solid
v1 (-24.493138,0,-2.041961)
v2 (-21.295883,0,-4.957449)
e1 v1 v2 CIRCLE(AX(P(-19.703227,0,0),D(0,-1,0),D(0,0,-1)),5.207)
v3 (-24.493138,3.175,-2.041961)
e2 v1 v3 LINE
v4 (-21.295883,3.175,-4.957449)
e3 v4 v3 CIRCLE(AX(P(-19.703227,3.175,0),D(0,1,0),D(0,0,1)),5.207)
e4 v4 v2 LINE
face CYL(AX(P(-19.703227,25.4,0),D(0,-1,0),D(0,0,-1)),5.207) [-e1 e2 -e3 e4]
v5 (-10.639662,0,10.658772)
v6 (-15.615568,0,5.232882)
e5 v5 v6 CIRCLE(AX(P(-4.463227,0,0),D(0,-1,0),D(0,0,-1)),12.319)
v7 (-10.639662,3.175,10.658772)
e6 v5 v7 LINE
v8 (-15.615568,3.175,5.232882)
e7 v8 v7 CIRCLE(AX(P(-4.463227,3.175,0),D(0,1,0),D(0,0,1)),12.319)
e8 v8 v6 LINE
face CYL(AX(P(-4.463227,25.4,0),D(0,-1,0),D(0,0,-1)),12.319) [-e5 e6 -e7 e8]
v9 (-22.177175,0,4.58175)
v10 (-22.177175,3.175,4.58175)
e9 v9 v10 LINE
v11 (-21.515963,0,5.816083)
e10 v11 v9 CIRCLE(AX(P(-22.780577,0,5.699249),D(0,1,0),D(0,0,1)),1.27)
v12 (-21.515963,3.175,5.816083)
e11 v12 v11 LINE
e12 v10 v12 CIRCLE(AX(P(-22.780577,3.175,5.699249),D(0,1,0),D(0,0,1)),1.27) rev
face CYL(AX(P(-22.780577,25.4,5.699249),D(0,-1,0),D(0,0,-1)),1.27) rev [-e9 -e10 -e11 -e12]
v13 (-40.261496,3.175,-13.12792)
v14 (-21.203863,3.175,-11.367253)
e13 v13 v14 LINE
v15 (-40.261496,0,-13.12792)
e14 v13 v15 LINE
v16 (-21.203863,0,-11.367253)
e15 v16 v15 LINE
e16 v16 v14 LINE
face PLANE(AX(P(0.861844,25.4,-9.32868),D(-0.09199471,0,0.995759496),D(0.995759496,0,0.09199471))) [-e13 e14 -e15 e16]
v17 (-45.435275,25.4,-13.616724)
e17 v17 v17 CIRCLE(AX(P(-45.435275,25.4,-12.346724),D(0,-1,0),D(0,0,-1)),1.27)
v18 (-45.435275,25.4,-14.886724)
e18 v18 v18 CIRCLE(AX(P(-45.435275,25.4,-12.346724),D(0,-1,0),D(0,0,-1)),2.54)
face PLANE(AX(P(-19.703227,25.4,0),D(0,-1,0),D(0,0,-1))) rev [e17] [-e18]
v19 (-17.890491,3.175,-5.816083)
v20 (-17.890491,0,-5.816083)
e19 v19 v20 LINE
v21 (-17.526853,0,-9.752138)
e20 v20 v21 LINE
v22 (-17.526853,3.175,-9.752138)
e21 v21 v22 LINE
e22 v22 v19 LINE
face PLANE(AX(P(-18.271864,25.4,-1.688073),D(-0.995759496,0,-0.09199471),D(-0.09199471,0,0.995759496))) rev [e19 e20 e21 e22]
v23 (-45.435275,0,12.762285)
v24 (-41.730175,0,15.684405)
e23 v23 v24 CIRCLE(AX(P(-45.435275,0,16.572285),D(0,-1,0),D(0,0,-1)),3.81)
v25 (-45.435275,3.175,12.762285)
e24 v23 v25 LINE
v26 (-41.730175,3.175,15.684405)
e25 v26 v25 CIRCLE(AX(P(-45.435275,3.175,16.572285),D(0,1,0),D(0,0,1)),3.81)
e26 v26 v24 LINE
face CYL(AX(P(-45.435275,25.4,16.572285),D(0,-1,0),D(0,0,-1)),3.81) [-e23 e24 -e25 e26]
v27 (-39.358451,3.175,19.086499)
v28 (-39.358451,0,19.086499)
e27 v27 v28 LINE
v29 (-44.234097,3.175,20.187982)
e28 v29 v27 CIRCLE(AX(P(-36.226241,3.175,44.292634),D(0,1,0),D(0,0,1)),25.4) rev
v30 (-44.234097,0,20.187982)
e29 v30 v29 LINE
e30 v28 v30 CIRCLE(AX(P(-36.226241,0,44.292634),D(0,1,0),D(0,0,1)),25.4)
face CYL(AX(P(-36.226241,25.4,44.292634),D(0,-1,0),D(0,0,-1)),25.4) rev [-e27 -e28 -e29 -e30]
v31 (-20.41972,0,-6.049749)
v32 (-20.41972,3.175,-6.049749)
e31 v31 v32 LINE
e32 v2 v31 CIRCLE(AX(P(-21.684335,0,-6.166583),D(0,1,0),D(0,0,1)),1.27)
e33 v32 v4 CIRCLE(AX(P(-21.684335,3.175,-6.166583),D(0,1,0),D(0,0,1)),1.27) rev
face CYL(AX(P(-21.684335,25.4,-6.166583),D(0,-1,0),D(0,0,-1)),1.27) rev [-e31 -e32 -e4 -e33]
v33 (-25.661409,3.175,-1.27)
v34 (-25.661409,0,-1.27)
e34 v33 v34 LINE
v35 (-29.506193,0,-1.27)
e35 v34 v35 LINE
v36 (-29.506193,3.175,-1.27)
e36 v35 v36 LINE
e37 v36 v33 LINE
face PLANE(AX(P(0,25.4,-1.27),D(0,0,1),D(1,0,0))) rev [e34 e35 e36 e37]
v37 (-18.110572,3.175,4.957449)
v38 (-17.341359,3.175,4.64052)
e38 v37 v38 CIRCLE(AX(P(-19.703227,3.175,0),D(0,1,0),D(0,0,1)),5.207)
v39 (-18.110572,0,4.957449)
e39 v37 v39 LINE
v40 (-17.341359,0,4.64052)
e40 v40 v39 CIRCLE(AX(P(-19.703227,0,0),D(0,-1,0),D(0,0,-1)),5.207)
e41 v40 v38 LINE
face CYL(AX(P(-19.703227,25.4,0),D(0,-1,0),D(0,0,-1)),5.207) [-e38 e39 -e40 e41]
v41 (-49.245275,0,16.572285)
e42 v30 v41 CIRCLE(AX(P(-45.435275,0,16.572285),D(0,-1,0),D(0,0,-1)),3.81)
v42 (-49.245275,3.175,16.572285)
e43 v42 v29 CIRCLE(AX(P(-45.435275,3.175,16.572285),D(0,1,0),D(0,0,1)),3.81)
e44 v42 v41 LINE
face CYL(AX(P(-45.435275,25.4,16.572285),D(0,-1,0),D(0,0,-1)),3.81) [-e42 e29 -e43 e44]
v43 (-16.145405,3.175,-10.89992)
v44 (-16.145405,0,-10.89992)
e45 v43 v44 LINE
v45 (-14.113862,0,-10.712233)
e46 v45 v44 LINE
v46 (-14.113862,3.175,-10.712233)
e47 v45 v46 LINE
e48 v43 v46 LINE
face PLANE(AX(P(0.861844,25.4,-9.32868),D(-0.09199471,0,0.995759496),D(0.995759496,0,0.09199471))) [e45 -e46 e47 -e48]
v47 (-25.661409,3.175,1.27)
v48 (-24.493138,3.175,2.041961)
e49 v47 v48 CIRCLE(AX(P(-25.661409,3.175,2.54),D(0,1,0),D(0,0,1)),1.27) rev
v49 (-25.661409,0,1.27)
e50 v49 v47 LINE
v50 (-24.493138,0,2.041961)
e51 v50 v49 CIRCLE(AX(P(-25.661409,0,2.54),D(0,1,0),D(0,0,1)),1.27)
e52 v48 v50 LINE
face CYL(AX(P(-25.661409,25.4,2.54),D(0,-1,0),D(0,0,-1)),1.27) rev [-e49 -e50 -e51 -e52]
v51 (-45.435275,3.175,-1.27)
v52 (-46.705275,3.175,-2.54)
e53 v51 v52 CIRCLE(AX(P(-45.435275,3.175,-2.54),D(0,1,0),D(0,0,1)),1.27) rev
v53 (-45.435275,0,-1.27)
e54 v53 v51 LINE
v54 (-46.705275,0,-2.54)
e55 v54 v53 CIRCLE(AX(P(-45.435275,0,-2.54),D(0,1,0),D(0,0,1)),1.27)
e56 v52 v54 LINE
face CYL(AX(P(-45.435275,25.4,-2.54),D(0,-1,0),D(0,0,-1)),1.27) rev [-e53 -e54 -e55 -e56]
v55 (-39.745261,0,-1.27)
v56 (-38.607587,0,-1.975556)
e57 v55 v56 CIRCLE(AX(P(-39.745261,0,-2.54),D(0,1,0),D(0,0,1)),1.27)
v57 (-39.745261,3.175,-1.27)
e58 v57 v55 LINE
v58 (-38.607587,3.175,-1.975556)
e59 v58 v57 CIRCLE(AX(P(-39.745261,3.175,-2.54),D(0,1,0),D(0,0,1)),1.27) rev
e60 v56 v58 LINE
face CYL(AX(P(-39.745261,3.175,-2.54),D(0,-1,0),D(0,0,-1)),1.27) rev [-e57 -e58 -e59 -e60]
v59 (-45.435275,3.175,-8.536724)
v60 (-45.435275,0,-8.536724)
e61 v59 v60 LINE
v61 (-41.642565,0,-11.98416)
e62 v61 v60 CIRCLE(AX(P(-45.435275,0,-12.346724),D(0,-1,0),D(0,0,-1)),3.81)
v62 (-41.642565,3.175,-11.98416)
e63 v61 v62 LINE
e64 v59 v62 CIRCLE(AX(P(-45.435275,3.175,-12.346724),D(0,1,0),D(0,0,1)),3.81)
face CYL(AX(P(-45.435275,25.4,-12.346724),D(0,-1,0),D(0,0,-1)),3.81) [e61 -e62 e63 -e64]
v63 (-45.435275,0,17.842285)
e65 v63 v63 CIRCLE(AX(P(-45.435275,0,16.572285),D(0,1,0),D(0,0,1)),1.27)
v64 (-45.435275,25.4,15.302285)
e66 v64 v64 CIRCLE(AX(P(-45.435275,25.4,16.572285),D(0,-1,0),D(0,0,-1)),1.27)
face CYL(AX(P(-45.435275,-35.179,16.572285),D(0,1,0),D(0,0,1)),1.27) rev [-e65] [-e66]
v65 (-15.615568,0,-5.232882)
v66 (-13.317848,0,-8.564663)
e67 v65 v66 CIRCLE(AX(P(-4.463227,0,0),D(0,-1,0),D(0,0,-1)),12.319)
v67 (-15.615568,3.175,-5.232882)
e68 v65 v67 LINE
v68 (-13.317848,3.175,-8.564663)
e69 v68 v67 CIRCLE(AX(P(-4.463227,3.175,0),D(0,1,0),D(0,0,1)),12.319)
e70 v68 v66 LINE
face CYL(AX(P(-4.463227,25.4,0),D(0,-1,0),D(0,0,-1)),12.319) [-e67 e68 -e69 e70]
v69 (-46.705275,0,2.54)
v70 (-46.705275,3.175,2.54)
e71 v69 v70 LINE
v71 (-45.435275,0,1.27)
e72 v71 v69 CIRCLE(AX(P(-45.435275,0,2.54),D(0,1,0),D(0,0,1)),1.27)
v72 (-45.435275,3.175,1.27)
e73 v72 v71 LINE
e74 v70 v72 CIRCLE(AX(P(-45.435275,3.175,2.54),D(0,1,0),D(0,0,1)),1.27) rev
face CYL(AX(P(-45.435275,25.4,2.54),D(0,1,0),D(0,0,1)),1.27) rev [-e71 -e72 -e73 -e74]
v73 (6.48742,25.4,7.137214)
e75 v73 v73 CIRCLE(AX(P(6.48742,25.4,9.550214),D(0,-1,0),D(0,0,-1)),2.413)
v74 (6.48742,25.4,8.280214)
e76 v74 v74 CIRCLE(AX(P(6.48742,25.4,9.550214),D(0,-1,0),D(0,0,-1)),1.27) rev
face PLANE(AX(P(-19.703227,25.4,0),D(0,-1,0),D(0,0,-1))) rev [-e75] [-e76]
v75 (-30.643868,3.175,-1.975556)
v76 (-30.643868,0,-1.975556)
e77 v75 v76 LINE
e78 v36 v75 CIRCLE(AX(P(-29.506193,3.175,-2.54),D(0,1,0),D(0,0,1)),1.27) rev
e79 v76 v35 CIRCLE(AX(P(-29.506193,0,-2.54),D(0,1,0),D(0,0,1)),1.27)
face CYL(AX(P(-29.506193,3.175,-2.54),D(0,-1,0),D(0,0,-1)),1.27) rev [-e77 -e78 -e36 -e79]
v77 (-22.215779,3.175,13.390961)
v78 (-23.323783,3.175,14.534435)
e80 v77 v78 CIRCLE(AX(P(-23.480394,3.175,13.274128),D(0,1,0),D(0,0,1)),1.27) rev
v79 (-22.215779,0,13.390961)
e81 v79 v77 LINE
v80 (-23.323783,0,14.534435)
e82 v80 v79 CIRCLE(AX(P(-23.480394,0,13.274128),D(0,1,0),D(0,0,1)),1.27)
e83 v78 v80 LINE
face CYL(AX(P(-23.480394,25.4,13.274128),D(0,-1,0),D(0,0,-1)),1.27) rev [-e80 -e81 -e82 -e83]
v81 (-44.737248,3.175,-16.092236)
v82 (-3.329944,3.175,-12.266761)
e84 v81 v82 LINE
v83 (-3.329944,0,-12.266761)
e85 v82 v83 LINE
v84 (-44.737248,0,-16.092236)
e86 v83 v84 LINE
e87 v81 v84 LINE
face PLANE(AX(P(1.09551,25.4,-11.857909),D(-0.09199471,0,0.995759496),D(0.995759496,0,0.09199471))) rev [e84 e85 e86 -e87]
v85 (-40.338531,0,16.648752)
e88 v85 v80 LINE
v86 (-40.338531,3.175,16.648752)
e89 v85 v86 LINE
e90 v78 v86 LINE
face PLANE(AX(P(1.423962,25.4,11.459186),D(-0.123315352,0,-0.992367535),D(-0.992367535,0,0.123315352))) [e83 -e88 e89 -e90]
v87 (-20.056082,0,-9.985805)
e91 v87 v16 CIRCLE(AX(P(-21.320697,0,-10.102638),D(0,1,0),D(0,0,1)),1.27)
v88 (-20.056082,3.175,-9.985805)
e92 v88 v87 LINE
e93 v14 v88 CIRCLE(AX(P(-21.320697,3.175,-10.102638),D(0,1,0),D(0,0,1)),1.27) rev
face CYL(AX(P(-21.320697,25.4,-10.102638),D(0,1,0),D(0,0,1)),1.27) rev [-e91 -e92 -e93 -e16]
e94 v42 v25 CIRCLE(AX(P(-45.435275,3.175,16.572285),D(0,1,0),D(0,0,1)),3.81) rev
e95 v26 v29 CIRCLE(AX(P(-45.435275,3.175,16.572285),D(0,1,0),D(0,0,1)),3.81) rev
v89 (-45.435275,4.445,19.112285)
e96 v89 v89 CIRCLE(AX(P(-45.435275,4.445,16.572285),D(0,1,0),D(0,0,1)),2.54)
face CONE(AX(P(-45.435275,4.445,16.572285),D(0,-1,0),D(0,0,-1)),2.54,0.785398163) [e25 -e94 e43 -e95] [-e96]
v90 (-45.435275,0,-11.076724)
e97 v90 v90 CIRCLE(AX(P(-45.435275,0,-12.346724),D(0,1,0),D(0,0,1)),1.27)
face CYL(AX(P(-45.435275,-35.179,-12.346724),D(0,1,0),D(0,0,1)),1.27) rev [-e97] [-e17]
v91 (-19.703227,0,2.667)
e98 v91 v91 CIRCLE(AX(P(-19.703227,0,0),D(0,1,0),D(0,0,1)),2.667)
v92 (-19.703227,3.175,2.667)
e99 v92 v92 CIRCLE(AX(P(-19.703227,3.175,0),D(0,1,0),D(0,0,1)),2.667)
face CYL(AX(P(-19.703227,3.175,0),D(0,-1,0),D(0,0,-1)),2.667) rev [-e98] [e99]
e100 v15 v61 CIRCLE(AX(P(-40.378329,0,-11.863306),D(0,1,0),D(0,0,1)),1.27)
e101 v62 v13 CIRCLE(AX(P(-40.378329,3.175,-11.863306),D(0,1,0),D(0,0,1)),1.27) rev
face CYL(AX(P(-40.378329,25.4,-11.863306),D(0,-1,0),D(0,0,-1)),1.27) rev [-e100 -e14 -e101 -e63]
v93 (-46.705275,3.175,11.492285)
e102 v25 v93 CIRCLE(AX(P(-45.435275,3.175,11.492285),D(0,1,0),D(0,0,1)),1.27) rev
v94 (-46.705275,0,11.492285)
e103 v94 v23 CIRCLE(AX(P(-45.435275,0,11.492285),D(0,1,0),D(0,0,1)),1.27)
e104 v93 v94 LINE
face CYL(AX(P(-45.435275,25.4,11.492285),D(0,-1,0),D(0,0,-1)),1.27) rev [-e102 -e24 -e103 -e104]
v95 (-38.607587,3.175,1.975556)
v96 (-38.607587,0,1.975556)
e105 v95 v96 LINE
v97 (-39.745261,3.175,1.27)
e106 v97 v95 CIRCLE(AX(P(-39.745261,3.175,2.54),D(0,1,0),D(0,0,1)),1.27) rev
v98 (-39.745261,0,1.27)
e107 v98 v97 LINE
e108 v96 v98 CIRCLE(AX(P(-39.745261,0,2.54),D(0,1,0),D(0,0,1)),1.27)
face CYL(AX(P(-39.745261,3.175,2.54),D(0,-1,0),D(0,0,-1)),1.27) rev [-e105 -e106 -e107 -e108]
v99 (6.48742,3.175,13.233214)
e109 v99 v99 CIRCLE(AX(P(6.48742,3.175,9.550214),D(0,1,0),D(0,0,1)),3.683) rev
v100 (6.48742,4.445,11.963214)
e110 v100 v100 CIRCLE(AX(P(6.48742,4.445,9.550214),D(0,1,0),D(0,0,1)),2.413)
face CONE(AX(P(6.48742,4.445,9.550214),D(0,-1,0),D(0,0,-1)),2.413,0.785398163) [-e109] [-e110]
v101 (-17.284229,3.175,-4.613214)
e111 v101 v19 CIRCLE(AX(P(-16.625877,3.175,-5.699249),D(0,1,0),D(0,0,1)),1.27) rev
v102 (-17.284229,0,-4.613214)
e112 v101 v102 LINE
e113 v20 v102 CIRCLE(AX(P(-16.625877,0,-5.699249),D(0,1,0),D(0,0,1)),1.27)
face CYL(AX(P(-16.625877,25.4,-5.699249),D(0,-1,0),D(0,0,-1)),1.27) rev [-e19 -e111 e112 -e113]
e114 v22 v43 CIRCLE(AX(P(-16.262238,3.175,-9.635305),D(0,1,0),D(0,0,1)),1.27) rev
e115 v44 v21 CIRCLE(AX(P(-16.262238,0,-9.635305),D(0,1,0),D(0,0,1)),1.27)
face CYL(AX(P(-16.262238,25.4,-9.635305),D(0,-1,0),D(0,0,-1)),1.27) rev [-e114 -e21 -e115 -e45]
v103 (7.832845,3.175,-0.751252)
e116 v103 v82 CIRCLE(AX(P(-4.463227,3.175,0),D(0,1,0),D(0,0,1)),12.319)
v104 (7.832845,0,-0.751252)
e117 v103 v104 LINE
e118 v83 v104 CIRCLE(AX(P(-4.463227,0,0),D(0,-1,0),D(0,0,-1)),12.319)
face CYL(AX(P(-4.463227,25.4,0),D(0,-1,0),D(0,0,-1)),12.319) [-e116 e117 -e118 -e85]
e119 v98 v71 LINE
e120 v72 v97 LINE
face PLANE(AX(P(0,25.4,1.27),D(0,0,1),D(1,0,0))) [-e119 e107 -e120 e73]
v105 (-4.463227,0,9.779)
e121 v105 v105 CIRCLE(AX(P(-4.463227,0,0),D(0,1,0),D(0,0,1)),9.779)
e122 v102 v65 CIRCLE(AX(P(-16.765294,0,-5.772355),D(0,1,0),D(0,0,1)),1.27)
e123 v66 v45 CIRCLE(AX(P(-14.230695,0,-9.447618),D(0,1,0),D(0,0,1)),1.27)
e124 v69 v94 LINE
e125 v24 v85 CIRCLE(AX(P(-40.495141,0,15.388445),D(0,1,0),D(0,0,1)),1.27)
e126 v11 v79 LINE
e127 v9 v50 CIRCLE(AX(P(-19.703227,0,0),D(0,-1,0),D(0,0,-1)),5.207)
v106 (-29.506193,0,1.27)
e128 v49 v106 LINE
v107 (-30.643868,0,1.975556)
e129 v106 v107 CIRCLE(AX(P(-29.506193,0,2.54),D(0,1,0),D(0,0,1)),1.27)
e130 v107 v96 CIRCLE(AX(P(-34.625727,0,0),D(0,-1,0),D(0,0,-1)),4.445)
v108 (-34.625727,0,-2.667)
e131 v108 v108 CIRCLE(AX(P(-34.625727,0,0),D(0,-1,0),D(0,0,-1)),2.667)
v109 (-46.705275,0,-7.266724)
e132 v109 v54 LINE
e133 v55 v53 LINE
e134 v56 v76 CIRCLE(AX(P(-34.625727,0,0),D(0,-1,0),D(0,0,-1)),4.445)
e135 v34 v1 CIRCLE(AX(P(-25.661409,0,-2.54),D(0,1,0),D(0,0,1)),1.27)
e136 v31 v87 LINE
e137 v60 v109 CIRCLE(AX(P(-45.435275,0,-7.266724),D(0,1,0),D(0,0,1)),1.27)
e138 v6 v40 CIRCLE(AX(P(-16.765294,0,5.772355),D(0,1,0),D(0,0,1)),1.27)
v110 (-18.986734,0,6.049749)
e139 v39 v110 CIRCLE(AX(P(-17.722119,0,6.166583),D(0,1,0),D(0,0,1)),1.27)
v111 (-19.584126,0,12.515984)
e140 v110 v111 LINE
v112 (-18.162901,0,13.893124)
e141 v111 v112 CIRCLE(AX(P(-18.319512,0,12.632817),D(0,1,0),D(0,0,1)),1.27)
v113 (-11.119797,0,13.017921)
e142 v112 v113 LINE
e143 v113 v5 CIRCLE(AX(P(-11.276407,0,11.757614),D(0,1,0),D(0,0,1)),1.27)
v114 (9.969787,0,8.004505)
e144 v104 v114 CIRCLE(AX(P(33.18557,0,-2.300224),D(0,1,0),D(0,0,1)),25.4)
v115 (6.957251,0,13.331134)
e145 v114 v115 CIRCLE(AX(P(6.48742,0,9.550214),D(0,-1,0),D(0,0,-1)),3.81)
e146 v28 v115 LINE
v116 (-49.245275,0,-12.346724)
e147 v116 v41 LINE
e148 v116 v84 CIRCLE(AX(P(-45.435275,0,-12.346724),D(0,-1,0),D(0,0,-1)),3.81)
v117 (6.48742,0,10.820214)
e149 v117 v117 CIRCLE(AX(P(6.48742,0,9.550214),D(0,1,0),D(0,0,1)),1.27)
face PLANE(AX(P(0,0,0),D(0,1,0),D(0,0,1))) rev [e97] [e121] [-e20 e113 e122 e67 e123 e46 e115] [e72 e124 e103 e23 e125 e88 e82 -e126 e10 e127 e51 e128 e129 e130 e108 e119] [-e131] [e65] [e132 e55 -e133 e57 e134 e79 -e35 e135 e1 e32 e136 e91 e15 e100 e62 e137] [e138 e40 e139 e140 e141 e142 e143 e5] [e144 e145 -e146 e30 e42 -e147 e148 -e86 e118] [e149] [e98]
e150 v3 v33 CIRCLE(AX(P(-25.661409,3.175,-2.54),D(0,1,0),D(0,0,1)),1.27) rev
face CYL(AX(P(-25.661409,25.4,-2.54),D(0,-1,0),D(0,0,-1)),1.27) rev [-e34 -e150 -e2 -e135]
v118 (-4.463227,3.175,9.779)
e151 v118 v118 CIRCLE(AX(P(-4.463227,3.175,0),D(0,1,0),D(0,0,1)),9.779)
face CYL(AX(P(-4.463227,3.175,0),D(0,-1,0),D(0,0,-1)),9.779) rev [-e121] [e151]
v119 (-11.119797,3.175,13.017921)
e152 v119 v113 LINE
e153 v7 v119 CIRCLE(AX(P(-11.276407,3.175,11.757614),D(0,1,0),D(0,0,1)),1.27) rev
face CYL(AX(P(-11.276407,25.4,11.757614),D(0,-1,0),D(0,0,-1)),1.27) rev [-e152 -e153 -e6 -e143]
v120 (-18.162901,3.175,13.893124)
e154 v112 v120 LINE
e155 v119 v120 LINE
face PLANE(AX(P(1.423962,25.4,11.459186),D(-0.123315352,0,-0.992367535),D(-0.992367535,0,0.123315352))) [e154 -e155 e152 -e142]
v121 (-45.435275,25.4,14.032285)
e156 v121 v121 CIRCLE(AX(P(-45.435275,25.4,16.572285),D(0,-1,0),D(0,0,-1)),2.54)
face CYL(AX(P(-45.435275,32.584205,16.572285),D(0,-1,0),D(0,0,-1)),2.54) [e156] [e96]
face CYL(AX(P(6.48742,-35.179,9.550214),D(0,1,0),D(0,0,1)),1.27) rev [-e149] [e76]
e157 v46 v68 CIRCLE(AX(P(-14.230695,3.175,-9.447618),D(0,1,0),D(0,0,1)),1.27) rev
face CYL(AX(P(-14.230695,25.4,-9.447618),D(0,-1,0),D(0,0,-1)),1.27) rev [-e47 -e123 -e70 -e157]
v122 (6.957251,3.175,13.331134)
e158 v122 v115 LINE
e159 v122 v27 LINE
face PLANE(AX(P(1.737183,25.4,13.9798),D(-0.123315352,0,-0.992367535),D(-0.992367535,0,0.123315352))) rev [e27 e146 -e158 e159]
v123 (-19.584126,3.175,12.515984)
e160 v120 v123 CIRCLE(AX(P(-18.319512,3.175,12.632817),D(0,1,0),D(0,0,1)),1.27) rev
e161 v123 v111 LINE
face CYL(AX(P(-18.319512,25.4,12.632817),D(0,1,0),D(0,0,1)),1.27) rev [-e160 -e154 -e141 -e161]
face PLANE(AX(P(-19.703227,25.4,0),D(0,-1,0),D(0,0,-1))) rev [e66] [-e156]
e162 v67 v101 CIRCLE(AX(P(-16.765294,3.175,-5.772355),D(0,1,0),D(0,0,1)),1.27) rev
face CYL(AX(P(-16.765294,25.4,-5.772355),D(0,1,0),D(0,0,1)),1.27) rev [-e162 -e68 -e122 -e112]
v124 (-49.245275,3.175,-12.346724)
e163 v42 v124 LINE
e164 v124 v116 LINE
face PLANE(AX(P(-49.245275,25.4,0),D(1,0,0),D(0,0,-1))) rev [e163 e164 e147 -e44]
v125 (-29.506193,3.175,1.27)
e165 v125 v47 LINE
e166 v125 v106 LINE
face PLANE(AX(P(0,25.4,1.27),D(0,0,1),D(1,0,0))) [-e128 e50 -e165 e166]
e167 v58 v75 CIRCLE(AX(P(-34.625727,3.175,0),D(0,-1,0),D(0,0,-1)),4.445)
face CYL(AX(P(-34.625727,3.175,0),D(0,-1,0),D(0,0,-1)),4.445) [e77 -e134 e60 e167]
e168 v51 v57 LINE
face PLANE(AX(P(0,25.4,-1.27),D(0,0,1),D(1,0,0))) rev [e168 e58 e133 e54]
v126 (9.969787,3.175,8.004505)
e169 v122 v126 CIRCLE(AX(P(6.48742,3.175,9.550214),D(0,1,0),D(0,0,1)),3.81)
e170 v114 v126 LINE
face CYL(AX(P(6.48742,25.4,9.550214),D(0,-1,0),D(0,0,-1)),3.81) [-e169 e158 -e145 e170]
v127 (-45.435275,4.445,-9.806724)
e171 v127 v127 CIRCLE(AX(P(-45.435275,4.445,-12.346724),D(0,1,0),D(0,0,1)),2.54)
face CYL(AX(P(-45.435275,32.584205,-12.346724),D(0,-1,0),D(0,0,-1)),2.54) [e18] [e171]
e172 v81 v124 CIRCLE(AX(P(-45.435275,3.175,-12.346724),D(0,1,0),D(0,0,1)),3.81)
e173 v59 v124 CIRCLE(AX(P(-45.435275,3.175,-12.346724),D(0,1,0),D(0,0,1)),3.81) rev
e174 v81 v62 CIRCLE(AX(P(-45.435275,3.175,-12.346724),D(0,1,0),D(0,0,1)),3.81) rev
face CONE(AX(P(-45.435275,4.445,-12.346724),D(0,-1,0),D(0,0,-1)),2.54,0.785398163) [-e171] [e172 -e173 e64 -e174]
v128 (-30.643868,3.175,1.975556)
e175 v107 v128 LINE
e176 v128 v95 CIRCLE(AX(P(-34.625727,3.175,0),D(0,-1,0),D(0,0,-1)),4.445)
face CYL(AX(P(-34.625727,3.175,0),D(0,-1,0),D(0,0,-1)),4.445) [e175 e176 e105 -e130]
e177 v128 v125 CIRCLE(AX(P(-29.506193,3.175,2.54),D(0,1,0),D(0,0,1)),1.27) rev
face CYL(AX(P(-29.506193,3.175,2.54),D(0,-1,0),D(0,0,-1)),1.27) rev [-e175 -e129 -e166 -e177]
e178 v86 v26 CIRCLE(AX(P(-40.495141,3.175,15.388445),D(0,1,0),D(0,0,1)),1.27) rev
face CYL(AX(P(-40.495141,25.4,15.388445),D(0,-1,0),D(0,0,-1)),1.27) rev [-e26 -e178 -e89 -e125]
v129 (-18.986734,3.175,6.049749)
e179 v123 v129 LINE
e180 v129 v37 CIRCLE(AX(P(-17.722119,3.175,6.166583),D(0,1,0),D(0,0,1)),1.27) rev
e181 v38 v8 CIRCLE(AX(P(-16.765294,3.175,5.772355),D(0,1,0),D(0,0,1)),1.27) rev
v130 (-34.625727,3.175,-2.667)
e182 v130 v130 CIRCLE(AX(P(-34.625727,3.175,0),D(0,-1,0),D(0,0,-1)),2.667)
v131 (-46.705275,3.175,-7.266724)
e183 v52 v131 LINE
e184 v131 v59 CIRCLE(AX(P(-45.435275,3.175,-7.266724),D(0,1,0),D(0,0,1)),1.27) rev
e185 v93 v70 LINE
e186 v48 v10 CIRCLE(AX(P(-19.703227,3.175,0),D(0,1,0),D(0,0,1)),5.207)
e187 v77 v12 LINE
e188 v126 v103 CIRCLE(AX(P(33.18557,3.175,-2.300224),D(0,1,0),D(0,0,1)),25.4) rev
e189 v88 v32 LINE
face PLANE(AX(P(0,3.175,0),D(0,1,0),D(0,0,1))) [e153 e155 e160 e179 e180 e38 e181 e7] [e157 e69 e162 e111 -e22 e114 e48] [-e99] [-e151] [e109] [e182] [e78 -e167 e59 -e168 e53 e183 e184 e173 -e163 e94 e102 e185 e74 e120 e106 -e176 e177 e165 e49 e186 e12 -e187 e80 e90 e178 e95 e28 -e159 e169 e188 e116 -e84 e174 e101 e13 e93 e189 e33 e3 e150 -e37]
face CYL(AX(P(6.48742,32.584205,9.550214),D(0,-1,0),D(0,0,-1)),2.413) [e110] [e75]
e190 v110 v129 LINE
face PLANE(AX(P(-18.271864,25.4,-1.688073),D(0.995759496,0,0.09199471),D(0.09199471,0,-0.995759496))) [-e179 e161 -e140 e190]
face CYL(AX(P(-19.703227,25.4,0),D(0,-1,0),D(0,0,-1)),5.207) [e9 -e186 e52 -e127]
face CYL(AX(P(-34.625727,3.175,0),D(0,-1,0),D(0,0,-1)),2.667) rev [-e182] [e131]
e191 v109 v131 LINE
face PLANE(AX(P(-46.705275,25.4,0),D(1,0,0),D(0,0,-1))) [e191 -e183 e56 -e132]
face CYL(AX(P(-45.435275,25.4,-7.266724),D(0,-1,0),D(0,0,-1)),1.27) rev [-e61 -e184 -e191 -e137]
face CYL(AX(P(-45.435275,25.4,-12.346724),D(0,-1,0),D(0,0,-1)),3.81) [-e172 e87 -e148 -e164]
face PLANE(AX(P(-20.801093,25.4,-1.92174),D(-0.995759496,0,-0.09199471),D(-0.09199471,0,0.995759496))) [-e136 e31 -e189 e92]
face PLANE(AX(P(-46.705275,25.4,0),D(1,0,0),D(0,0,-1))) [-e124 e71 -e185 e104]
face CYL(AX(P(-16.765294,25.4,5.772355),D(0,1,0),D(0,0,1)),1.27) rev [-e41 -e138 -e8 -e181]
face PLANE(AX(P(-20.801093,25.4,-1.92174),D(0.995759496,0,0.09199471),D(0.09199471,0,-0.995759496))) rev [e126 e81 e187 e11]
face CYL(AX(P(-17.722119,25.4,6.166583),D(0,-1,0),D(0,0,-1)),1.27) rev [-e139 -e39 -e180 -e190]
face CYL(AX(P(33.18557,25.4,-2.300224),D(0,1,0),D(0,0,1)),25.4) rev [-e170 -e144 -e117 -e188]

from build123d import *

# Parameters (mm, degrees)
SKETCH2_W           = 97.751871484
SKETCH2_H           = 58.283909604
SKETCH2_R           = 9.779
SKETCH2_R_2         = 2.667
BOSS_EXTRUDE1_DEPTH = 3.175
SKETCH4_R           = 1.27
CUT_EXTRUDE1_DEPTH  = 38.354
BOSS_EXTRUDE2_START = 22.225
SKETCH5_R           = 2.54
SKETCH5_R_2         = 1.27
SKETCH5_R_3         = 2.413
BOSS_EXTRUDE2_DEPTH = 22.225
SKETCH6_W           = 97.751871484
SKETCH6_H           = 58.283909604
CUT_EXTRUDE2_DEPTH  = 25.4
FILLET4_R           = 25.4
CHAMFER1_SIZE       = 1.27
FILLET5_R           = 1.27
FILLET6_R           = 25.4
SKETCH10_R          = 4.445
SKETCH10_R_2        = 2.667
BOSS_EXTRUDE4_DEPTH = 3.175
CUT_EXTRUDE4_DEPTH  = 11.049
FILLET8_R           = 1.27


# Some blends are built 0.0001 mm under size
with BuildPart() as part:
    # Sketch2 → Boss-Extrude1 (new body)
    with BuildSketch(Plane(origin=(0, 0, 0), x_dir=(1, 0, 0), z_dir=(0, 1, 0))):
        with Locations((-16.988515934, 0.541740914)):
            Rectangle(SKETCH2_W, SKETCH2_H)
        with Locations(Location((-4.463227118, 0, 0), (0, 0, 270))):
            Circle(SKETCH2_R, mode=Mode.SUBTRACT)
        with Locations(Location((-19.703227118, 0, 0), (0, 0, 270))):
            Circle(SKETCH2_R_2, mode=Mode.SUBTRACT)
    extrude(amount=BOSS_EXTRUDE1_DEPTH)

    # Sketch4 → Cut-Extrude1 (cut)
    with BuildSketch(Plane(origin=(0, 3.175, 0), x_dir=(1, 0, 0), z_dir=(0, 1, 0))):
        with Locations(Location((6.487419808, -9.550213888, 0), (0, 0, 270))):
            Circle(SKETCH4_R)
        with Locations(Location((-45.435275157, -16.572284597, 0), (0, 0, 270))):
            Circle(SKETCH4_R)
        with Locations(Location((-45.435275157, 12.346724353, 0), (0, 0, 270))):
            Circle(SKETCH4_R)
    extrude(amount=-CUT_EXTRUDE1_DEPTH, mode=Mode.SUBTRACT)

    # Sketch5 → Boss-Extrude2 (add)
    # profile 1 of 3: a face of its own
    with BuildSketch(Plane(origin=(0, 3.175, 0), x_dir=(1, 0, 0), z_dir=(0, 1, 0)).offset(BOSS_EXTRUDE2_START)):
        with Locations(Location((-45.435275157, -16.572284597, 0), (0, 0, 90))):
            Circle(SKETCH5_R)
        with Locations(Location((-45.435275157, -16.572284597, 0), (0, 0, 270))):
            Circle(SKETCH5_R_2, mode=Mode.SUBTRACT)
    # profile 2 of 3: a face of its own
    with BuildSketch(Plane(origin=(0, 3.175, 0), x_dir=(1, 0, 0), z_dir=(0, 1, 0)).offset(BOSS_EXTRUDE2_START)):
        with Locations(Location((6.487419808, -9.550213888, 0), (0, 0, 90))):
            Circle(SKETCH5_R_3)
        with Locations(Location((6.487419808, -9.550213888, 0), (0, 0, 270))):
            Circle(SKETCH5_R_2, mode=Mode.SUBTRACT)
    # profile 3 of 3: a face of its own
    with BuildSketch(Plane(origin=(0, 3.175, 0), x_dir=(1, 0, 0), z_dir=(0, 1, 0)).offset(BOSS_EXTRUDE2_START)):
        with Locations(Location((-45.435275157, 12.346724353, 0), (0, 0, 90))):
            Circle(SKETCH5_R)
        with Locations(Location((-45.435275157, 12.346724353, 0), (0, 0, 270))):
            Circle(SKETCH5_R_2, mode=Mode.SUBTRACT)
    extrude(amount=-BOSS_EXTRUDE2_DEPTH)

    # Sketch6 → Cut-Extrude2 (cut)
    # profile 1 of 5: a face of its own
    with BuildSketch(Plane.XZ):
        with Locations((-16.988515934, -0.541740914)):
            Rectangle(SKETCH6_W, SKETCH6_H)
        with BuildLine():
            ThreePointArc((6.436488339, 5.740554325), (6.365628562, -5.87312912), (-3.329944281, -12.266761227))
            Line((-3.329944281, -12.266761227), (-44.737248056, -16.092236089))
            ThreePointArc((-44.737248056, -16.092236089), (-47.870086931, -15.277217763), (-49.245275157, -12.346724353))
            Line((-49.245275157, -12.346724353), (-49.245275157, 16.572284597))
            ThreePointArc((-49.245275157, 16.572284597), (-47.084422142, 20.006875434), (-43.052931733, 19.545589124))
            Line((-43.052931733, 19.545589124), (6.957251299, 13.331134195))
            ThreePointArc((6.957251299, 13.331134195), (10.28848479, 9.289436202), (6.436488339, 5.740554325))
        make_face(mode=Mode.SUBTRACT)
    # profile 2 of 5: a face of its own
    with BuildSketch(Plane.XZ):
        with BuildLine():
            Line((-22.309779638, 14.408430842), (-41.632671147, 16.809566593))
            ThreePointArc((-41.632671147, 16.809566593), (-43.139721395, 13.531473368), (-46.705275157, 12.980182148))
            Line((-46.705275157, 12.980182148), (-46.705275157, 1.27))
            Line((-46.705275157, 1.27), (-24.752974537, 1.27))
            ThreePointArc((-24.752974537, 1.27), (-23.550764492, 3.508461936), (-21.432391729, 4.911500662))
            Line((-21.432391729, 4.911500662), (-22.309779638, 14.408430842))
        make_face()
    # profile 3 of 5: a face of its own
    with BuildSketch(Plane.XZ):
        with BuildLine():
            ThreePointArc((-18.90316261, 5.145167226), (-17.439844382, 4.689344047), (-16.172627118, 3.827233027))
            ThreePointArc((-16.172627118, 3.827233027), (-12.021521278, 9.727792678), (-5.278151046, 12.292016108))
            Line((-5.278151046, 12.292016108), (-19.729338668, 14.087775465))
            Line((-19.729338668, 14.087775465), (-18.90316261, 5.145167226))
        make_face()
    # profile 4 of 5: a face of its own
    with BuildSketch(Plane.XZ):
        with BuildLine():
            Line((-41.737410786, -13.264274947), (-19.939248877, -11.250419593))
            Line((-19.939248877, -11.250419593), (-20.503291626, -5.145167226))
            ThreePointArc((-20.503291626, -5.145167226), (-23.211689054, -3.847537374), (-24.752974537, -1.27))
            Line((-24.752974537, -1.27), (-46.705275157, -1.27))
            Line((-46.705275157, -1.27), (-46.705275157, -8.754621904))
            ThreePointArc((-46.705275157, -8.754621904), (-42.874440529, -9.525691562), (-41.737410786, -13.264274947))
        make_face()
    # profile 5 of 5: a face of its own
    with BuildSketch(Plane.XZ):
        with BuildLine():
            Line((-17.410019758, -11.016753028), (-11.023764962, -10.426749455))
            ThreePointArc((-11.023764962, -10.426749455), (-14.175902418, -7.577710705), (-16.172627118, -3.827233027))
            ThreePointArc((-16.172627118, -3.827233027), (-17.018047419, -4.461239624), (-17.974062507, -4.911500662))
            Line((-17.974062507, -4.911500662), (-17.410019758, -11.016753028))
        make_face()
    extrude(amount=-CUT_EXTRUDE2_DEPTH, mode=Mode.SUBTRACT)

    # Fillet4
    fillet4_edges = [part.edges().sort_by_distance(p)[0] for p in [
        (6.436488339, 1.5875, 5.740554325),
    ]]
    fillet(fillet4_edges, radius=FILLET4_R)

    # Chamfer1
    chamfer1_edges = [part.edges().sort_by_distance(p)[0] for p in [
        (-45.435275157, 3.175, 19.112284597),
        (6.487419808, 3.175, 11.963213888),
        (-45.435275157, 3.175, -9.806724353),
    ]]
    chamfer(chamfer1_edges, length=CHAMFER1_SIZE - 0.0001)  # a hair under: the kernel refuses the full size

    # Fillet5
    # the kernel refuses this fillet: 1.27 mm, written as the material it adds along each edge
    with BuildSketch(Plane(origin=(-17.974062507, 0, -4.911500662), x_dir=(0.09199471039426901, 0, -0.9957594956913414), z_dir=(0, 1, 0)), Plane(origin=(-24.752974537, 0, -1.27), x_dir=(-1, 0, 0), z_dir=(0, 1, 0))) as fillet5_piece_1:
        with BuildLine():
            CenterArc((0.908434266, -1.27), FILLET5_R, 90, 66.911227563)
            ThreePointArc((-0.259836652, -0.771960784), (-0.114800695, -0.391068882), (0, 0))
            Line((0, 0), (0.908434266, 0))
        make_face()
    extrude(amount=3.175)
    with BuildSketch(Plane(origin=(-16.172627118, 0, -3.827233027), x_dir=(0.3684237494880866, 0, -0.9296579698002592), z_dir=(0, 1, 0))) as fillet5_piece_2:
        with BuildLine():
            CenterArc((1.589945225, 1.267606245), FILLET5_R, 174.6438829, 91.83772784)
            ThreePointArc((0.325490362, 1.38615539), (0.210349349, 0.681899513), (0, 0))
            ThreePointArc((0, 0), (0.756003367, 0.023219427), (1.512006734, 0))
        make_face()
    extrude(amount=3.175)
    with BuildSketch(Plane(origin=(-11.023764962, 0, -10.426749455), x_dir=(-0.7764213228150341, 0, 0.6302141933328324), z_dir=(0, 1, 0))) as fillet5_piece_3:
        with BuildLine():
            CenterArc((3.106991559, -1.260834502), FILLET5_R, 96.887717688, 128.767983471)
            Line((2.219301663, -2.169078218), (0, 0))
            ThreePointArc((0, 0), (1.477344026, -0.08890533), (2.954688051, 0))
        make_face()
    extrude(amount=3.175)
    with BuildSketch(Plane(origin=(-17.410019758, 0, -11.016753028), x_dir=(0.9957594956913395, 0, 0.09199471039428954), z_dir=(0, 1, 0)), Plane(origin=(-46.705275157, 0, -1.27), x_dir=(0, 0, -1), z_dir=(0, 1, 0)), Plane(origin=(-19.939248877, 0, -11.250419593), x_dir=(-0.09199471039428968, 0, 0.9957594956913395), z_dir=(0, 1, 0)), Plane(origin=(-46.705275157, 0, 1.27), x_dir=(1, 0, 0), z_dir=(0, 1, 0))) as fillet5_piece_4:
        with BuildLine():
            CenterArc((FILLET5_R, -FILLET5_R), FILLET5_R, 90, 90)
            Line((0, -FILLET5_R), (0, 0))
            Line((0, 0), (FILLET5_R, 0))
        make_face()
    extrude(amount=3.175)
    with BuildSketch(Plane(origin=(-41.737410786, 0, -13.264274947), x_dir=(0.07388880850314143, 0, 0.9972664859394333), z_dir=(0, 1, 0))) as fillet5_piece_5:
        with BuildLine():
            CenterArc((1.49756055, 1.251850976), FILLET5_R, 170.484249697, 89.817777443)
            Line((0.245035504, 1.461805755), (0, 0))
            ThreePointArc((0, 0), (0.641811664, 0.054447073), (1.283623328, 0))
        make_face()
    extrude(amount=3.175)
    with BuildSketch(Plane(origin=(-46.705275157, 0, -8.754621904), x_dir=(0.9855985596534799, 0, 0.16910197872581528), z_dir=(0, 1, 0))) as fillet5_piece_6:
        with BuildLine():
            CenterArc((1.503316591, -1.251710171), FILLET5_R, 99.735610317, 90)
            Line((0.25160642, -1.466469684), (0, 0))
            ThreePointArc((0, 0), (0.644278539, -0.054869488), (1.288557078, 0))
        make_face()
    extrude(amount=3.175)
    with BuildSketch(Plane(origin=(-20.503291626, 0, -5.145167226), x_dir=(-0.973080394076375, 0, 0.23046593384742647), z_dir=(0, 1, 0)), Plane(origin=(-24.752974537, 0, 1.27), x_dir=(0.31900689110536185, 0, 0.9477523956325786), z_dir=(0, 1, 0)), Plane(origin=(-18.90316261, 0, 5.145167226), x_dir=(0.9730803940763765, 0, -0.23046593384742128), z_dir=(0, 1, 0))) as fillet5_piece_7:
        with BuildLine():
            CenterArc((0.913848751, -1.266109504), FILLET5_R, 94.485895933, 66.911227563)
            Line((-0.289796791, -0.860970752), (0, 0))
            ThreePointArc((0, 0), (0.407258683, -0.015951034), (0.814517365, 0))
        make_face()
    extrude(amount=3.175)
    with BuildSketch(Plane(origin=(-46.705275157, 0, 12.980182148), x_dir=(0, 0, -1), z_dir=(0, 1, 0))) as fillet5_piece_8:
        with BuildLine():
            CenterArc((1.487897552, -1.27), FILLET5_R, 90, 90)
            ThreePointArc((0.217897552, -1.27), (0.163028064, -0.625721461), (0, 0))
            Line((0, 0), (1.487897552, 0))
        make_face()
    extrude(amount=3.175)
    with BuildSketch(Plane(origin=(-41.632671147, 0, 16.809566593), x_dir=(-0.08633378250672864, 0, -0.9962662686240465), z_dir=(0, 1, 0))) as fillet5_piece_9:
        with BuildLine():
            CenterArc((1.317608219, -1.255973552), FILLET5_R, 98.523346596, 83.607406319)
            Line((0.04848632, -1.303192257), (0, 0))
            ThreePointArc((0, 0), (0.564689237, -0.042079345), (1.129378473, 0))
        make_face()
    extrude(amount=3.175)
    with BuildSketch(Plane(origin=(-22.309779638, 0, 14.408430842), x_dir=(-0.9923675347346895, 0, 0.12331535186096959), z_dir=(0, 1, 0))) as fillet5_piece_10:
        with BuildLine():
            CenterArc((FILLET5_R * 0.804568904671, -FILLET5_R), FILLET5_R, 90, 77.638148391)
            Line((-FILLET5_R * 0.172246131175, -FILLET5_R * 0.785915003457), (0, 0))
            Line((0, 0), (FILLET5_R * 0.804568904671, 0))
        make_face()
    extrude(amount=3.175)
    with BuildSketch(Plane(origin=(-21.432391729, 0, 4.911500662), x_dir=(-0.914386500954342, 0, -0.40484234817083437), z_dir=(0, 1, 0))) as fillet5_piece_11:
        with BuildLine():
            CenterArc((0.913848751, 1.266109504), FILLET5_R, 198.602876504, 66.911227563)
            Line((-0.289796791, 0.860970752), (0, 0))
            ThreePointArc((0, 0), (0.407258683, 0.015951034), (0.814517365, 0))
        make_face()
    extrude(amount=3.175)
    with BuildSketch(Plane(origin=(-16.172627118, 0, 3.827233027), x_dir=(0.36842374948808637, 0, 0.9296579698002592), z_dir=(0, 1, 0))) as fillet5_piece_12:
        with BuildLine():
            CenterArc((1.589945225, -1.267606245), FILLET5_R, 93.51838926, 91.83772784)
            ThreePointArc((0.325490362, -1.38615539), (0.210349349, -0.681899513), (0, 0))
            ThreePointArc((0, 0), (0.756003367, -0.023219427), (1.512006734, 0))
        make_face()
    extrude(amount=3.175)
    with BuildSketch(Plane(origin=(-19.729338668, 0, 14.087775465), x_dir=(0.9923675347346897, 0, -0.12331535186096762), z_dir=(0, 1, 0))) as fillet5_piece_13:
        with BuildLine():
            CenterArc((FILLET5_R * 1.24290162619, FILLET5_R), FILLET5_R, 167.638148391, 102.361851609)
            Line((FILLET5_R * 0.266086590346, FILLET5_R * 1.21408499654), (0, 0))
            Line((0, 0), (FILLET5_R * 1.24290162619, 0))
        make_face()
    extrude(amount=3.175)
    with BuildSketch(Plane(origin=(-5.278151046, 0, 12.292016108), x_dir=(-0.9923675347346885, 0, 0.12331535186097764), z_dir=(0, 1, 0))) as fillet5_piece_14:
        with BuildLine():
            CenterArc((5.886574882, -1.27), FILLET5_R, 90, 142.825531736)
            ThreePointArc((5.119184861, -2.281935055), (2.691092308, -0.845966939), (0, 0))
            Line((0, 0), (5.886574882, 0))
        make_face()
    extrude(amount=3.175)

    # Fillet6
    fillet6_edges = [part.edges().sort_by_distance(p)[0] for p in [
        (-43.052931733, 1.5875, 19.545589124),
    ]]
    fillet(fillet6_edges, radius=FILLET6_R)

    # Sketch10 → Boss-Extrude4 (add)
    with BuildSketch(Plane.XZ):
        with Locations((-34.625727118, 0)):
            Circle(SKETCH10_R)
        with Locations((-34.625727118, 0)):
            Circle(SKETCH10_R_2, mode=Mode.SUBTRACT)
    extrude(amount=-BOSS_EXTRUDE4_DEPTH)

    # Sketch11 → Cut-Extrude4 (cut)
    with BuildSketch(Plane.XZ):
        with BuildLine():
            ThreePointArc((-31.958727118, 0), (-32.04042712, 0.655067111), (-32.280521583, 1.27))
            ThreePointArc((-32.280521583, 1.27), (-34.625727118, 2.667), (-36.970932653, 1.27))
            ThreePointArc((-36.970932653, 1.27), (-35.280794229, -2.585299998), (-31.958727118, 0))
        make_face()
    extrude(amount=-CUT_EXTRUDE4_DEPTH, mode=Mode.SUBTRACT)

    # Fillet8
    fillet8_edges = [part.edges().sort_by_distance(p)[0] for p in [
        (-30.366017621, 1.5875, 1.27),
        (-38.885436615, 1.5875, 1.27),
        (-38.885436615, 1.5875, -1.27),
        (-30.366017621, 1.5875, -1.27),
    ]]
    fillet(fillet8_edges, radius=FILLET8_R)


solid = part.part
